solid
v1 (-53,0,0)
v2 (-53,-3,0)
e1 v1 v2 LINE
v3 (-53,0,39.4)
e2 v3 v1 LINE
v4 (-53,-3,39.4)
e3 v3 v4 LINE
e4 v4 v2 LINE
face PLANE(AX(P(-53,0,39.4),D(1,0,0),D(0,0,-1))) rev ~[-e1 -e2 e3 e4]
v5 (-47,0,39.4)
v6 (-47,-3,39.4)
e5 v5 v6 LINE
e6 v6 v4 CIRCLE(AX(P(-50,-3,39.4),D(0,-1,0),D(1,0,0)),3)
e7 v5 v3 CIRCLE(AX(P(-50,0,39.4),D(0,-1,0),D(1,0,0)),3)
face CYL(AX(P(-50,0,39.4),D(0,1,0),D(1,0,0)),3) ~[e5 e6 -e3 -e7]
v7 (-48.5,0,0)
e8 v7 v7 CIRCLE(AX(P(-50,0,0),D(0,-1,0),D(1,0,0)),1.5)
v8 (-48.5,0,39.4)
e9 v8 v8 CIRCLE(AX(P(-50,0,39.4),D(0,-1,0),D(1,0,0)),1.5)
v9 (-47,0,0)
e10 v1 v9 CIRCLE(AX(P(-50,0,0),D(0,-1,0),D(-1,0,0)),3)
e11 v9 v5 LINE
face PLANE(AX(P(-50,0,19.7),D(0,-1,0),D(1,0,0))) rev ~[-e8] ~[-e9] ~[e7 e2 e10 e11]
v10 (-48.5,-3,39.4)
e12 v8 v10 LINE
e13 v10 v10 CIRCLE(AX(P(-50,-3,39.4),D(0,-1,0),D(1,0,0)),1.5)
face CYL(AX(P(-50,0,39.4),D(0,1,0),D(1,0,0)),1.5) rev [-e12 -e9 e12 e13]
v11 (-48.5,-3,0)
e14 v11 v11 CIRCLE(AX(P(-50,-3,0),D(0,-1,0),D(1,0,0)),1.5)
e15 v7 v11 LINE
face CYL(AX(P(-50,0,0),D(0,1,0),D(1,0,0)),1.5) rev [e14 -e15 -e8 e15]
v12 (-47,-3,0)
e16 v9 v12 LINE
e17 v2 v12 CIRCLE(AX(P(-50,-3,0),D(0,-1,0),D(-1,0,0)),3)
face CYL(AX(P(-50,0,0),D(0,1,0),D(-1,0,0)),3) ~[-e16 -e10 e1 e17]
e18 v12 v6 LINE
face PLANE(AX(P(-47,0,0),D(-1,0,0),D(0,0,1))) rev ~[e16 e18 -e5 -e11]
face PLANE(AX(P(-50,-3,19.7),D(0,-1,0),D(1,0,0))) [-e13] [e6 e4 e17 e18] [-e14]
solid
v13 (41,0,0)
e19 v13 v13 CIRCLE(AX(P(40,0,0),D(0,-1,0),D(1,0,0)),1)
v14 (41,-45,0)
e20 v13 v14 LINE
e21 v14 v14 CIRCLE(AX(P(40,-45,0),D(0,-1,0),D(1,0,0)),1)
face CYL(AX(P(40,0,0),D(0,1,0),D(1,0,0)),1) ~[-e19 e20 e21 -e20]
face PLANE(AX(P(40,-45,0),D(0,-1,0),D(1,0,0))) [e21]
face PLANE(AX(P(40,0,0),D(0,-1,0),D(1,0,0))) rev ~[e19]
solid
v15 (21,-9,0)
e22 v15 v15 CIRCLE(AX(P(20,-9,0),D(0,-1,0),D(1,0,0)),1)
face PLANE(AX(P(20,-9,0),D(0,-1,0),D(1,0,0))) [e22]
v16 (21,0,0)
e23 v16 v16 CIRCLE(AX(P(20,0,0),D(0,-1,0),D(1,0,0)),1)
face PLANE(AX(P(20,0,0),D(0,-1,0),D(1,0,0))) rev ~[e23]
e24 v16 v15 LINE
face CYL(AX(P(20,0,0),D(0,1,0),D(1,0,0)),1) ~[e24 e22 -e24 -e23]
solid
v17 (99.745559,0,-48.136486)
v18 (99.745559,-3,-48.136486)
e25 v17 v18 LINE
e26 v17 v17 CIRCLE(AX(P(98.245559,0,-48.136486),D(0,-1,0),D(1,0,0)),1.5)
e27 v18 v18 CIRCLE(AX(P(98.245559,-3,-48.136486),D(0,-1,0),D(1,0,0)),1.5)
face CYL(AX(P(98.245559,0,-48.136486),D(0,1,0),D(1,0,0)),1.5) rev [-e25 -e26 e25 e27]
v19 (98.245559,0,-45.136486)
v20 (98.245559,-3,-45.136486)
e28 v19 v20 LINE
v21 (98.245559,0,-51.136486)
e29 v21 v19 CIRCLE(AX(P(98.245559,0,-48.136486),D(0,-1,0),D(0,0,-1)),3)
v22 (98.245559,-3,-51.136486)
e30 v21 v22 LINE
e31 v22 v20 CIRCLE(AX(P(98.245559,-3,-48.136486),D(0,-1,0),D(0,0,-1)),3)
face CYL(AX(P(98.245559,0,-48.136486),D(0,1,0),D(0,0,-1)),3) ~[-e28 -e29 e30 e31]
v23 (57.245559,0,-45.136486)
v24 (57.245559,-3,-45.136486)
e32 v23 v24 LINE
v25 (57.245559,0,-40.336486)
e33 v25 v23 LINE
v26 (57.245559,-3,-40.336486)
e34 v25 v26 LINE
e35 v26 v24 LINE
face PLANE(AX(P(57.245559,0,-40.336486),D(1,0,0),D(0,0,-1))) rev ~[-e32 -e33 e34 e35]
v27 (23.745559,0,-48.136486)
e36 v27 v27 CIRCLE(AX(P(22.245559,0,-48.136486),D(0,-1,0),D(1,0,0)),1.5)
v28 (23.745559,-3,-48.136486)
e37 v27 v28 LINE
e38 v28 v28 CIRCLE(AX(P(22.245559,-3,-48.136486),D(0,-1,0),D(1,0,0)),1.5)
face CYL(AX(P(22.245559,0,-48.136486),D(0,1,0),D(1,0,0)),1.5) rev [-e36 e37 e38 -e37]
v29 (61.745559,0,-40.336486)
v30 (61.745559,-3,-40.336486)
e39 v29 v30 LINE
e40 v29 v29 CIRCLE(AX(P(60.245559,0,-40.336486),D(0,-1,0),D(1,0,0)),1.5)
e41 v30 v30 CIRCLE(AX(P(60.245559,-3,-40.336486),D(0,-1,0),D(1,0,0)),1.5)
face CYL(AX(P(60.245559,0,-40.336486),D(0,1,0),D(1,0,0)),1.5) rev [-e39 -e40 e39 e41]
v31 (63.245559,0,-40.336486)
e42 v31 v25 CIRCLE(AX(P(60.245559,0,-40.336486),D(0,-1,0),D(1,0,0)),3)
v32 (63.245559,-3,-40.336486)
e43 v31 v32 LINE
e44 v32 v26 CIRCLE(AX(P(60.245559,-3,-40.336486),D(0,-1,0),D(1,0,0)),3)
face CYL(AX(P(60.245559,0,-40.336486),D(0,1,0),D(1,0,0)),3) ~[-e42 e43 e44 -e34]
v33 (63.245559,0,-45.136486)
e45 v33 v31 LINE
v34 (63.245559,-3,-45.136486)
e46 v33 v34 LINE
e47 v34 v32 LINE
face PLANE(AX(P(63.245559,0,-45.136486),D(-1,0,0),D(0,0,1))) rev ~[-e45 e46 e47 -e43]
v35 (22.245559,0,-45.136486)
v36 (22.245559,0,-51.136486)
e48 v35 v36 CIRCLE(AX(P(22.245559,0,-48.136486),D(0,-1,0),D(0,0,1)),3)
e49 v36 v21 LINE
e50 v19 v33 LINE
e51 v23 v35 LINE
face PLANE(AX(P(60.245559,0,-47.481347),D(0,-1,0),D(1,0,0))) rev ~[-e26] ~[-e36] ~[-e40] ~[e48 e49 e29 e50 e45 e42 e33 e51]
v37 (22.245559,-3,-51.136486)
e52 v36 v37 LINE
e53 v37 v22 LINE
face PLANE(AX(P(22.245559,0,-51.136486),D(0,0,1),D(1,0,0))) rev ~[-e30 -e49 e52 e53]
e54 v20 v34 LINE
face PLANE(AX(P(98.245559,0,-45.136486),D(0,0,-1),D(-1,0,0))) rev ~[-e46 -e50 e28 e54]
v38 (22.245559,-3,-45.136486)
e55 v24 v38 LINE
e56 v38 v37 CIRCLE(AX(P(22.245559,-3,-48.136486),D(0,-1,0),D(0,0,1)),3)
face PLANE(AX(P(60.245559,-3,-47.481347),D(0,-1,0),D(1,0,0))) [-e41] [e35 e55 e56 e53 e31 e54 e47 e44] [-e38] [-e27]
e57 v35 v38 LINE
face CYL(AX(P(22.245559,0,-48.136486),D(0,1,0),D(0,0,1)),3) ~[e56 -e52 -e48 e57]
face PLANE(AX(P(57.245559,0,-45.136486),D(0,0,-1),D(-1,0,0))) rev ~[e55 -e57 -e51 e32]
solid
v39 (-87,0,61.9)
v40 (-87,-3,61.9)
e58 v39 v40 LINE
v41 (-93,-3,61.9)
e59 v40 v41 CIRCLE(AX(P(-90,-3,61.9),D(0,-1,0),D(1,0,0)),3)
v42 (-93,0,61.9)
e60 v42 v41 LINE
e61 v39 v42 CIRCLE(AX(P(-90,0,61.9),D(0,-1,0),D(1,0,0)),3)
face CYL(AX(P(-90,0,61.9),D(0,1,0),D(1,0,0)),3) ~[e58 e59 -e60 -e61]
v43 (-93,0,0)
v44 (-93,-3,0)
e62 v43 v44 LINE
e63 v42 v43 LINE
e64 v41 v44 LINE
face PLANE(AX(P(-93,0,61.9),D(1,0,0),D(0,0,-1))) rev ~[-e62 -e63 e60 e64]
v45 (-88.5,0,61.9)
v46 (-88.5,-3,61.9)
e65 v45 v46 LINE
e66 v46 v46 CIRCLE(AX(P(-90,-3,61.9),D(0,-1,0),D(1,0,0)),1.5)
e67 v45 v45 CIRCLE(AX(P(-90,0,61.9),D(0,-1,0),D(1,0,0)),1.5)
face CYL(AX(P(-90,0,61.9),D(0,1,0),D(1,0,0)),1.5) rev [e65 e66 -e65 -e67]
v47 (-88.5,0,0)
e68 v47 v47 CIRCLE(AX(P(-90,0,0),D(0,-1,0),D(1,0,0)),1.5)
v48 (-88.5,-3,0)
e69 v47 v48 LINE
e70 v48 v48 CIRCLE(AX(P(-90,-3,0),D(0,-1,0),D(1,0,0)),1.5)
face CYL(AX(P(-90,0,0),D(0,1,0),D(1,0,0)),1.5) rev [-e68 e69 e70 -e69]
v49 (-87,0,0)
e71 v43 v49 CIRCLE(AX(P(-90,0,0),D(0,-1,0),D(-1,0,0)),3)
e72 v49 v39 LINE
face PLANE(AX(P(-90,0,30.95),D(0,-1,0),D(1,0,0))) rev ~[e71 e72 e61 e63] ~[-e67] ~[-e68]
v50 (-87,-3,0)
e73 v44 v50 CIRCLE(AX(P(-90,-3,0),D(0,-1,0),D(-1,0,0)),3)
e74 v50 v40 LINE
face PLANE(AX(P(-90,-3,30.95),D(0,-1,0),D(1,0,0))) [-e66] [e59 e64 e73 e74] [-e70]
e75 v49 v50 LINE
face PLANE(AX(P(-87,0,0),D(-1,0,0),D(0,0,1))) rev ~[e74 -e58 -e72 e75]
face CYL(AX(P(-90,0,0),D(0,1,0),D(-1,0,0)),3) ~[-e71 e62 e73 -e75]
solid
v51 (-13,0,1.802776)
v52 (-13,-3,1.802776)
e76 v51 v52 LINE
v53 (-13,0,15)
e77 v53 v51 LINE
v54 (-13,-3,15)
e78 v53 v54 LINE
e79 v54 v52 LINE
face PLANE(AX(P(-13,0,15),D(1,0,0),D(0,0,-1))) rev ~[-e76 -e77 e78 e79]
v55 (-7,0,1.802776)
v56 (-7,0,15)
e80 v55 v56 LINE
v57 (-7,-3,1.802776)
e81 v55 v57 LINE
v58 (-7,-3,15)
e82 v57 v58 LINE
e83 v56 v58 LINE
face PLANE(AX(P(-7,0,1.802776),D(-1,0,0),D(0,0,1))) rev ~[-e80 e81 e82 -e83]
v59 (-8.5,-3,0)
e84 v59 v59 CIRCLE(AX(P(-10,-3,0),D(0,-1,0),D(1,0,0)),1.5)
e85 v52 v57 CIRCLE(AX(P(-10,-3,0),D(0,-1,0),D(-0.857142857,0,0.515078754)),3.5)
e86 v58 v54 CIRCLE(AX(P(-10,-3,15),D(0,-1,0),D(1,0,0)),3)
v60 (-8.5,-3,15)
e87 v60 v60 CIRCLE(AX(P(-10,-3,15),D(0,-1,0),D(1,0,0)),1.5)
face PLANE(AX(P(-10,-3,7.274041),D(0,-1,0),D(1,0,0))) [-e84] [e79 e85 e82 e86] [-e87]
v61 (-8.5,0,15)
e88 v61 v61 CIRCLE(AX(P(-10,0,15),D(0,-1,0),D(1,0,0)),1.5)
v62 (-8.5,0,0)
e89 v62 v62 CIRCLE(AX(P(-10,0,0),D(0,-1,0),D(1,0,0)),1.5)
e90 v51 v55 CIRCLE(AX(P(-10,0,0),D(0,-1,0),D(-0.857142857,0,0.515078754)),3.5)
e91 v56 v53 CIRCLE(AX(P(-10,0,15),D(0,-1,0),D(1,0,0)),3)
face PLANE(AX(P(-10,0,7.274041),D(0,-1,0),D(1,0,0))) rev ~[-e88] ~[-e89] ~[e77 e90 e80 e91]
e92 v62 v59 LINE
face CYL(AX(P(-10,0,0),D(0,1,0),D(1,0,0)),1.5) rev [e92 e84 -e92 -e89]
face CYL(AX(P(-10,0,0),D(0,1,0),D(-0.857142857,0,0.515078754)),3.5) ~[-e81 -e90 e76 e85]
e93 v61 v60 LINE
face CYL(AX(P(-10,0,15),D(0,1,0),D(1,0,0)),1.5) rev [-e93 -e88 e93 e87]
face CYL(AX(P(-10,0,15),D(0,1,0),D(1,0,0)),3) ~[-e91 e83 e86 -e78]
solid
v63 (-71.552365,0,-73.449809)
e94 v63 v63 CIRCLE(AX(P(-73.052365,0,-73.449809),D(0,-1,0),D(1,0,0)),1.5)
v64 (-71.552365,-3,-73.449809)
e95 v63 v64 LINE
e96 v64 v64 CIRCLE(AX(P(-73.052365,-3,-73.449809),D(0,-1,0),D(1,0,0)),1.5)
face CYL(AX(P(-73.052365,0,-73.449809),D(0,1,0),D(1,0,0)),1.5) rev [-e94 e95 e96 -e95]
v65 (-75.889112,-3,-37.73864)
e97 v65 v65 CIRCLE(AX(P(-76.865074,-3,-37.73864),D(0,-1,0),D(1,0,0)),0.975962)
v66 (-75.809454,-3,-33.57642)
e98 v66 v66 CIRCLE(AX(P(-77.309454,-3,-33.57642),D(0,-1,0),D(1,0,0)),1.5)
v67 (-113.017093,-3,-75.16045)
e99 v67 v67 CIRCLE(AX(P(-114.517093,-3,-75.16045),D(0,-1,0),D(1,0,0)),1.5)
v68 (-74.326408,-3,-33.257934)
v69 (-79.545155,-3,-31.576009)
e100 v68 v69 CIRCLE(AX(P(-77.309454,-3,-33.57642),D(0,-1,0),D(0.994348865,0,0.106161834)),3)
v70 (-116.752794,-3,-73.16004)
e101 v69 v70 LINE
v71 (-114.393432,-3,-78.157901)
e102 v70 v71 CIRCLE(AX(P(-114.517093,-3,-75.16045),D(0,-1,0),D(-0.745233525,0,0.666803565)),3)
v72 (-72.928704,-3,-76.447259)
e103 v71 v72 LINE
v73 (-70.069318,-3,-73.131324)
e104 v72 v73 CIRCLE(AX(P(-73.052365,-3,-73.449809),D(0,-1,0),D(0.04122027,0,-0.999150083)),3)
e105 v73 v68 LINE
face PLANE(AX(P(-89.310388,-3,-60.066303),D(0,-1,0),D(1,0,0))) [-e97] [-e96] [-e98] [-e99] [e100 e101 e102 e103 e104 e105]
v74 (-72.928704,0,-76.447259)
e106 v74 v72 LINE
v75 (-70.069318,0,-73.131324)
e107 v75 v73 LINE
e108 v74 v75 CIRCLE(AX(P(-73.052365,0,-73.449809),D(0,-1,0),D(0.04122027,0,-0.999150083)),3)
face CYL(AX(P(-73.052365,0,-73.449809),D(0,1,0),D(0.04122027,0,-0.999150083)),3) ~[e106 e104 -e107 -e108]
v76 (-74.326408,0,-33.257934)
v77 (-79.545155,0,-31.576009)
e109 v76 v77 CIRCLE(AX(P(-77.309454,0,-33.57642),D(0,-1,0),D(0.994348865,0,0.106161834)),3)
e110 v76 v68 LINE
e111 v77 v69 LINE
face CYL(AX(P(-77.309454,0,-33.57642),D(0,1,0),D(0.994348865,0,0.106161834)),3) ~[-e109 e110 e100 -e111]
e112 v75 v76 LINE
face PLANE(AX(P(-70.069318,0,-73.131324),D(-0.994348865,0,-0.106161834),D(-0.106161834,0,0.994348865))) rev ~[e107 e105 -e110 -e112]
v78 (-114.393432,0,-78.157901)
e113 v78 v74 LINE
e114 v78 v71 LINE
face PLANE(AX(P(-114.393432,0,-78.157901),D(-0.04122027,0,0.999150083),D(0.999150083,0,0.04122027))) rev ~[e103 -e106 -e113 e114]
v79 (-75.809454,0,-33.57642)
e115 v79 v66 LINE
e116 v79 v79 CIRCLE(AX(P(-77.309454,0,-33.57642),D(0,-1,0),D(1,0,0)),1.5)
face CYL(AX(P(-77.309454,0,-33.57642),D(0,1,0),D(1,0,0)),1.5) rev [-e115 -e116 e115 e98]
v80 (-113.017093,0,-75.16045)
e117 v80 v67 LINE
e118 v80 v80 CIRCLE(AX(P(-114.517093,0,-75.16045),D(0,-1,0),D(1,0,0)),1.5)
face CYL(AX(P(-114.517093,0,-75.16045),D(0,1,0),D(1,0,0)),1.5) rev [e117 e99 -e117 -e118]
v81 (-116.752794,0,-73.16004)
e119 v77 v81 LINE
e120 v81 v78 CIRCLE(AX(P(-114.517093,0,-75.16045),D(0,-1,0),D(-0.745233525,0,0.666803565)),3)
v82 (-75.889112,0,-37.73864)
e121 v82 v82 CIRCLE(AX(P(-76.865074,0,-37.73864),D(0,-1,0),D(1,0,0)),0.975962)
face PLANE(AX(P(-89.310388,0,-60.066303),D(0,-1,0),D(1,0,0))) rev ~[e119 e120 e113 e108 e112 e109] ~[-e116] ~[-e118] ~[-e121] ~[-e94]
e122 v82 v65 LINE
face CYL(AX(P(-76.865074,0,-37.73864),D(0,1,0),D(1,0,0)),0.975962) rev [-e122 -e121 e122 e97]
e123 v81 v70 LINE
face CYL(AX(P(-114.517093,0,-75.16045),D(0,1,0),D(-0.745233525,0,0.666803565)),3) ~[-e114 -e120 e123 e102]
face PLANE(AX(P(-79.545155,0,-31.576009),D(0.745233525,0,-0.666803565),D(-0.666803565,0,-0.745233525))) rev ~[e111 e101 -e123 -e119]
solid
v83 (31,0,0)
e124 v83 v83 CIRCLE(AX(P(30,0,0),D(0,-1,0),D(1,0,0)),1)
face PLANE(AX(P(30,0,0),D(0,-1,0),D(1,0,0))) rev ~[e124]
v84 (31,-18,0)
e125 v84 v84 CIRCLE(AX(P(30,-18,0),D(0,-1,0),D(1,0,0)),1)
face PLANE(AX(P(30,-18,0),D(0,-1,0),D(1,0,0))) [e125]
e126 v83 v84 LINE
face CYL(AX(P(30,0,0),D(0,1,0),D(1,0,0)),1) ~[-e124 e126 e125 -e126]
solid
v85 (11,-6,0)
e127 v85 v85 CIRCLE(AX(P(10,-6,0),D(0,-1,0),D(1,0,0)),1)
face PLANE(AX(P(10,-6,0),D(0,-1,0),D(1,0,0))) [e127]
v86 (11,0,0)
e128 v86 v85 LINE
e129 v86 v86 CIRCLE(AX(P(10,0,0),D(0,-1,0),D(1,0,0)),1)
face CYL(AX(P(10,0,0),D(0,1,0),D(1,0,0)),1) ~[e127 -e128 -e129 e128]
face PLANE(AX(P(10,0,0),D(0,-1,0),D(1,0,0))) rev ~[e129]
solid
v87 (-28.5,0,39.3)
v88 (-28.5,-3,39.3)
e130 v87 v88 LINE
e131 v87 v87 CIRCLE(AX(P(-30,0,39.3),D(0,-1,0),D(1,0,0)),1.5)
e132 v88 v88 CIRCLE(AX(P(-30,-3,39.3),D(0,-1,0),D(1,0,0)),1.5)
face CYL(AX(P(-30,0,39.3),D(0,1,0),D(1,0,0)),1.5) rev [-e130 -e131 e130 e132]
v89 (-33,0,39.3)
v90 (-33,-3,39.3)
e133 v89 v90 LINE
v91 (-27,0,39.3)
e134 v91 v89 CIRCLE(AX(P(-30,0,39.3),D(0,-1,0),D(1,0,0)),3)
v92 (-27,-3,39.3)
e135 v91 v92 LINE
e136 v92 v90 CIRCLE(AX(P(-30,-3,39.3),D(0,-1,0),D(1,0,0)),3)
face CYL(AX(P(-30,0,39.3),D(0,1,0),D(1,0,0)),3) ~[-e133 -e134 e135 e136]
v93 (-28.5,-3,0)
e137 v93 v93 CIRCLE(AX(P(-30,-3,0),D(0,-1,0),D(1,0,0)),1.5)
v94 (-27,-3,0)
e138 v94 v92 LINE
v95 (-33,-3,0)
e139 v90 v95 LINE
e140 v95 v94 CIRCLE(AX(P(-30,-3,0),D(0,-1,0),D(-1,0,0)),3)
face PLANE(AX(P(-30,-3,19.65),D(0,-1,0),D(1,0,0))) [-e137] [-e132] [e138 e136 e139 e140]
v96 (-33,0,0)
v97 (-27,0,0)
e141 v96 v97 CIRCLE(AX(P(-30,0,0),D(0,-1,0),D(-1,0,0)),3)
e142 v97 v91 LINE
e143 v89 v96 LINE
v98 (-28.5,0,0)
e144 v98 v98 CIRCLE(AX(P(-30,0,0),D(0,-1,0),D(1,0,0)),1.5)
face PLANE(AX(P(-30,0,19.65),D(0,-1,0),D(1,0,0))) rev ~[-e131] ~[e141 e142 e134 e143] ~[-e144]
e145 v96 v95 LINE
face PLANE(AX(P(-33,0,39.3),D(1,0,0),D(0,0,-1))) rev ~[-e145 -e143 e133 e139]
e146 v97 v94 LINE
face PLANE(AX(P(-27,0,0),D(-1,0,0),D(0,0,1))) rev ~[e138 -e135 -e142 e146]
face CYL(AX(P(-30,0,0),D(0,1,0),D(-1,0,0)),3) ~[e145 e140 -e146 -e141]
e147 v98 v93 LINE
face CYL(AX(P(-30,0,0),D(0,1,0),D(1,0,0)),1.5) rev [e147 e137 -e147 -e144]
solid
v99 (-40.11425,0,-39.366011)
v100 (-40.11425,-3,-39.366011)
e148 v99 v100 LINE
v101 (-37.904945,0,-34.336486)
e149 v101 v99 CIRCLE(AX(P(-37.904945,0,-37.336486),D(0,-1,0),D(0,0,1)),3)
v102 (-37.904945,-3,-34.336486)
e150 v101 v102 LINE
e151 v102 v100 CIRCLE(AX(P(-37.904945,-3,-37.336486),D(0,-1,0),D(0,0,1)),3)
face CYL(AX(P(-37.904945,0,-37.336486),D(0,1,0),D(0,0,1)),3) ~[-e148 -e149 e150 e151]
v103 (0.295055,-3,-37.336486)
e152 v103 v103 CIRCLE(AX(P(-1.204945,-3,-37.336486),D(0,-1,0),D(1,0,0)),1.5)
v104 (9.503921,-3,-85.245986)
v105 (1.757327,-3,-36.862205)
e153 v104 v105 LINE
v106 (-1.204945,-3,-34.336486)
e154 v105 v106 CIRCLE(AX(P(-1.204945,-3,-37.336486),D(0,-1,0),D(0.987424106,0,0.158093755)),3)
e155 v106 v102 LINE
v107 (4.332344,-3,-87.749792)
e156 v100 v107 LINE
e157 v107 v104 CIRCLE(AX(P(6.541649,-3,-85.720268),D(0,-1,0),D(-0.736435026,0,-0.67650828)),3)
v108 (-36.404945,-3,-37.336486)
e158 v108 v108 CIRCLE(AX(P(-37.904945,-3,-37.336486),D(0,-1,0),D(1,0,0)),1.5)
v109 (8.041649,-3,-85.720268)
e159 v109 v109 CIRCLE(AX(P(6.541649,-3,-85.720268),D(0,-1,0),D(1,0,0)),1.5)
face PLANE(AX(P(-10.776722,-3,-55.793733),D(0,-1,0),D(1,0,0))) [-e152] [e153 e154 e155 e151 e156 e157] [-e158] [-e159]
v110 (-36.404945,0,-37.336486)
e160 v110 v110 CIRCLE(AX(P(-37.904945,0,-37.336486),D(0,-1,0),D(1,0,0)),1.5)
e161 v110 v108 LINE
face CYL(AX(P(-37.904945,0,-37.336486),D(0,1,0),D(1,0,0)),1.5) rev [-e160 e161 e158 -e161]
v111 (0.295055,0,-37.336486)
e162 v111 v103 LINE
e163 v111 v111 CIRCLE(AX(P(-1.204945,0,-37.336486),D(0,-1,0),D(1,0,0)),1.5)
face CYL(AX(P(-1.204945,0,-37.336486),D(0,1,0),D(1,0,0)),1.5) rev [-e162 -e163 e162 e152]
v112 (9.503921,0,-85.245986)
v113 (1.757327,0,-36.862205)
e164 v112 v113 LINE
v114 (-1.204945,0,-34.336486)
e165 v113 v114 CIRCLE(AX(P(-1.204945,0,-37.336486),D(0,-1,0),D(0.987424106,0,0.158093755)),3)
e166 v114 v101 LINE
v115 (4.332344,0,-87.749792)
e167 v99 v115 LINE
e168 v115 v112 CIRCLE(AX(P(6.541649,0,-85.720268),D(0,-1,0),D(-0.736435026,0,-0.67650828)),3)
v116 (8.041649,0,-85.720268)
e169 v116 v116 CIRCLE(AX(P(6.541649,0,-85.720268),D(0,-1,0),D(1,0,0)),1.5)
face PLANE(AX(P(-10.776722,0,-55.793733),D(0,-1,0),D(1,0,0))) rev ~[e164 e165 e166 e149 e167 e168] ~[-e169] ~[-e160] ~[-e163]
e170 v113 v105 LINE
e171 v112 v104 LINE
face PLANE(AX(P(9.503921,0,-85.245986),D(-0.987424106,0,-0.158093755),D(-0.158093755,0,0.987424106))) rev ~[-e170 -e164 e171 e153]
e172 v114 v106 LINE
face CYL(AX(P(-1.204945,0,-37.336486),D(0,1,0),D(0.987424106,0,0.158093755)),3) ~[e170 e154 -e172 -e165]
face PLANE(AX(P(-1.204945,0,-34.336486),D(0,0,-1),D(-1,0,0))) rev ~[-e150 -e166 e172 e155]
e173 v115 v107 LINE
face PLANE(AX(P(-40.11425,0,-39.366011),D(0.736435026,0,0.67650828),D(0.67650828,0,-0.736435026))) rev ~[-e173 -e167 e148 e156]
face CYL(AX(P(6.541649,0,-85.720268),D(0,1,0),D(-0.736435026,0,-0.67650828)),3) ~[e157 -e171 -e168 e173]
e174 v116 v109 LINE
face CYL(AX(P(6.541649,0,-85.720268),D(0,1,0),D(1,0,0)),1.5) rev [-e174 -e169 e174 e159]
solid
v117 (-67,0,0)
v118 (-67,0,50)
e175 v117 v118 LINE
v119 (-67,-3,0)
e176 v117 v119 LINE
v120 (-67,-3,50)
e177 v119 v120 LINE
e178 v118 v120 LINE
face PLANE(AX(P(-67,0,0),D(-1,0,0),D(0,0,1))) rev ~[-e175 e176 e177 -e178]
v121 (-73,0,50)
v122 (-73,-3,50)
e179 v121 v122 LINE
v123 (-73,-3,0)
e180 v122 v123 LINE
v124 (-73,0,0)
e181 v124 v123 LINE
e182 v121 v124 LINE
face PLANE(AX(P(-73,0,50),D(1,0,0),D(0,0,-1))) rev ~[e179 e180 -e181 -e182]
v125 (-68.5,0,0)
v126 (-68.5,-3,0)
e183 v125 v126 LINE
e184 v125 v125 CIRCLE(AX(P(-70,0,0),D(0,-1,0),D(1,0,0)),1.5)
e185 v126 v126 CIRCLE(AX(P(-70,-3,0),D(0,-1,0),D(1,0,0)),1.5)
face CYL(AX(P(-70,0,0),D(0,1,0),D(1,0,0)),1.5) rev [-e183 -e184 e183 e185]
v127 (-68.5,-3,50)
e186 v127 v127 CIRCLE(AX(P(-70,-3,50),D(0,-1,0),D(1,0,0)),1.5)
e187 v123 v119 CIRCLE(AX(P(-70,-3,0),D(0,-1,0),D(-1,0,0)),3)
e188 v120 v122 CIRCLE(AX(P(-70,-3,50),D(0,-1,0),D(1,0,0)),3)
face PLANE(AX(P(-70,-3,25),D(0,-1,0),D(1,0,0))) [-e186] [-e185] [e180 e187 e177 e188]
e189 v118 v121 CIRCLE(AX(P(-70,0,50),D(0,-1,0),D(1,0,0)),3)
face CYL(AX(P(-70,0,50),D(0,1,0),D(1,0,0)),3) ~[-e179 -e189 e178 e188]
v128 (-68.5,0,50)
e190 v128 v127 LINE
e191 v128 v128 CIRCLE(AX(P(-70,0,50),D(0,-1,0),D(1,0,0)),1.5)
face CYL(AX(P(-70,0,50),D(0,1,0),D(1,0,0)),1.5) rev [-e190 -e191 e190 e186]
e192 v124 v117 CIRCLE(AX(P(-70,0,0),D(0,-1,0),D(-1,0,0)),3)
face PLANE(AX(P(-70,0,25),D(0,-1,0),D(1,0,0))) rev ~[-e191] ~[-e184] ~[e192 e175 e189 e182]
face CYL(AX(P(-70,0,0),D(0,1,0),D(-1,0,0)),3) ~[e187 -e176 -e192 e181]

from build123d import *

# Parameters (mm, degrees)
F0_R     = 1.5
F2_DEPTH = 3
F0_R_2   = 0.9759621608
F3_R     = 1
F4_DEPTH = 6
F5_DEPTH = 9
F6_DEPTH = 18
F7_DEPTH = 45


# Not quite as in the source:
# - a feature names something its author has since deleted; it is built from what else it names


with BuildPart() as f2:
    # F0 (on Front) → F2 (new body)
    with BuildSketch(Plane.XZ):
        with BuildLine():
            Line((-93, 61.9), (-93, 0))
            ThreePointArc((-93, 0), (-90, -3), (-87, 0))
            Line((-87, 0), (-87, 61.9))
            ThreePointArc((-87, 61.9), (-90, 64.9), (-93, 61.9))
        make_face()
        with Locations((-90, 0)):
            Circle(F0_R, mode=Mode.SUBTRACT)
        with Locations((-90, 61.9)):
            Circle(F0_R, mode=Mode.SUBTRACT)
    extrude(amount=F2_DEPTH)


with BuildPart() as f2b:
    # F0 (on Front) → F2, piece 2 (new body)
    with BuildSketch(Plane.XZ):
        with BuildLine():
            Line((-73, 50), (-73, 0))
            ThreePointArc((-73, 0), (-70, -3), (-67, 0))
            Line((-67, 0), (-67, 50))
            ThreePointArc((-67, 50), (-70, 53), (-73, 50))
        make_face()
        with Locations((-70, 0)):
            Circle(F0_R, mode=Mode.SUBTRACT)
        with Locations((-70, 50)):
            Circle(F0_R, mode=Mode.SUBTRACT)
    extrude(amount=F2_DEPTH)


with BuildPart() as f2c:
    # F0 (on Front) → F2, piece 3 (new body)
    with BuildSketch(Plane.XZ):
        with BuildLine():
            Line((-53, 39.4), (-53, 0))
            ThreePointArc((-53, 0), (-50, -3), (-47, 0))
            Line((-47, 0), (-47, 39.4))
            ThreePointArc((-47, 39.4), (-50, 42.4), (-53, 39.4))
        make_face()
        with Locations((-50, 0)):
            Circle(F0_R, mode=Mode.SUBTRACT)
        with Locations((-50, 39.4)):
            Circle(F0_R, mode=Mode.SUBTRACT)
    extrude(amount=F2_DEPTH)


with BuildPart() as f2d:
    # F0 (on Front) → F2, piece 4 (new body)
    with BuildSketch(Plane.XZ):
        with BuildLine():
            Line((-33, 39.3), (-33, 0))
            ThreePointArc((-33, 0), (-30, -3), (-27, 0))
            Line((-27, 0), (-27, 39.3))
            ThreePointArc((-27, 39.3), (-30, 42.3), (-33, 39.3))
        make_face()
        with Locations((-30, 0)):
            Circle(F0_R, mode=Mode.SUBTRACT)
        with Locations((-30, 39.3)):
            Circle(F0_R, mode=Mode.SUBTRACT)
    extrude(amount=F2_DEPTH)


with BuildPart() as f2e:
    # F0 (on Front) → F2, piece 5 (new body)
    with BuildSketch(Plane.XZ):
        with BuildLine():
            Line((-70.0693181039, -73.1313235704), (-74.3264076657, -33.2579340924))
            ThreePointArc((-74.3264076657, -33.2579340924), (-76.3892099419, -30.7210473968), (-79.545154834, -31.576008902))
            Line((-79.545154834, -31.576008902), (-116.7527937374, -73.1600395777))
            ThreePointArc((-116.7527937374, -73.1600395777), (-117.2299941009, -76.4411409069), (-114.393432354, -78.1579005219))
            Line((-114.393432354, -78.1579005219), (-72.9287038888, -76.4472593243))
            ThreePointArc((-72.9287038888, -76.4472593243), (-70.7804128493, -75.4089504152), (-70.0693181039, -73.1313235704))
        make_face()
        with Locations((-114.5170931635, -75.1604502714)):
            Circle(F0_R, mode=Mode.SUBTRACT)
        with Locations((-73.0523646983, -73.4498090738)):
            Circle(F0_R, mode=Mode.SUBTRACT)
        with Locations((-76.8650740152, -37.7386403628)):
            Circle(F0_R_2, mode=Mode.SUBTRACT)
        with Locations((-77.30945426, -33.5764195958)):
            Circle(F0_R, mode=Mode.SUBTRACT)
    extrude(amount=F2_DEPTH)


with BuildPart() as f2f:
    # F0 (on Front) → F2, piece 6 (new body)
    with BuildSketch(Plane.XZ):
        with BuildLine():
            Line((-1.2049454206, -34.3364864443), (-37.9049454206, -34.3364864443))
            ThreePointArc((-37.9049454206, -34.3364864443), (-40.6516320173, -36.1299572323), (-40.1142504973, -39.3660112847))
            Line((-40.1142504973, -39.3660112847), (4.3323435081, -87.7497924651))
            ThreePointArc((4.3323435081, -87.7497924651), (7.8489363001, -88.4204525868), (9.503920902, -85.2459863591))
            Line((9.503920902, -85.2459863591), (1.7573268966, -36.8622051786))
            ThreePointArc((1.7573268966, -36.8622051786), (0.7414815885, -35.0536325509), (-1.2049454206, -34.3364864443))
        make_face()
        with Locations((-37.9049454206, -37.3364864443)):
            Circle(F0_R, mode=Mode.SUBTRACT)
        with Locations((6.5416485849, -85.7202676247)):
            Circle(F0_R, mode=Mode.SUBTRACT)
        with Locations((-1.2049454206, -37.3364864443)):
            Circle(F0_R, mode=Mode.SUBTRACT)
    extrude(amount=F2_DEPTH)


with BuildPart() as f2g:
    # F0 (on Front) → F2, piece 7 (new body)
    with BuildSketch(Plane.XZ):
        with BuildLine():
            Line((57.2455593391, -45.1364864443), (22.2455593391, -45.1364864443))
            ThreePointArc((22.2455593391, -45.1364864443), (19.2455593391, -48.1364864443), (22.2455593391, -51.1364864443))
            Line((22.2455593391, -51.1364864443), (98.2455593391, -51.1364864443))
            ThreePointArc((98.2455593391, -51.1364864443), (101.2455593391, -48.1364864443), (98.2455593391, -45.1364864443))
            Line((98.2455593391, -45.1364864443), (63.2455593391, -45.1364864443))
            Line((63.2455593391, -45.1364864443), (63.2455593391, -40.3364864443))
            ThreePointArc((63.2455593391, -40.3364864443), (60.2455593391, -37.3364864443), (57.2455593391, -40.3364864443))
            Line((57.2455593391, -40.3364864443), (57.2455593391, -45.1364864443))
        make_face()
        with Locations((22.2455593391, -48.1364864443)):
            Circle(F0_R, mode=Mode.SUBTRACT)
        with Locations((60.2455593391, -40.3364864443)):
            Circle(F0_R, mode=Mode.SUBTRACT)
        with Locations((98.2455593391, -48.1364864443)):
            Circle(F0_R, mode=Mode.SUBTRACT)
    extrude(amount=F2_DEPTH)


with BuildPart() as f2h:
    # F0 (on Front) → F2, piece 8 (new body)
    with BuildSketch(Plane.XZ):
        with BuildLine():
            Line((-7, 1.8027756377), (-7, 15))
            ThreePointArc((-7, 15), (-10, 18), (-13, 15))
            Line((-13, 15), (-13, 1.8027756377))
            ThreePointArc((-13, 1.8027756377), (-10, -3.5), (-7, 1.8027756377))
        make_face()
        with Locations((-10, 0)):
            Circle(F0_R, mode=Mode.SUBTRACT)
        with Locations((-10, 15)):
            Circle(F0_R, mode=Mode.SUBTRACT)
    extrude(amount=F2_DEPTH)


with BuildPart() as f4:
    # F3 (on Front) → F4 (new body)
    with BuildSketch(Plane.XZ):
        with Locations((10, 0)):
            Circle(F3_R)
    extrude(amount=F4_DEPTH)


with BuildPart() as f5:
    # F3 (on Front) → F5 (new body)
    with BuildSketch(Plane.XZ):
        with Locations((20, 0)):
            Circle(F3_R)
    extrude(amount=F5_DEPTH)


with BuildPart() as f6:
    # F3 (on Front) → F6 (new body)
    with BuildSketch(Plane.XZ):
        with Locations((30, 0)):
            Circle(F3_R)
    extrude(amount=F6_DEPTH)


with BuildPart() as f7:
    # F3 (on Front) → F7 (new body)
    with BuildSketch(Plane.XZ):
        with Locations((40, 0)):
            Circle(F3_R)
    extrude(amount=F7_DEPTH)


solid = Compound([f2.part, f2b.part, f2c.part, f2d.part, f2e.part, f2f.part, f2g.part, f2h.part, f4.part, f5.part, f6.part, f7.part])
